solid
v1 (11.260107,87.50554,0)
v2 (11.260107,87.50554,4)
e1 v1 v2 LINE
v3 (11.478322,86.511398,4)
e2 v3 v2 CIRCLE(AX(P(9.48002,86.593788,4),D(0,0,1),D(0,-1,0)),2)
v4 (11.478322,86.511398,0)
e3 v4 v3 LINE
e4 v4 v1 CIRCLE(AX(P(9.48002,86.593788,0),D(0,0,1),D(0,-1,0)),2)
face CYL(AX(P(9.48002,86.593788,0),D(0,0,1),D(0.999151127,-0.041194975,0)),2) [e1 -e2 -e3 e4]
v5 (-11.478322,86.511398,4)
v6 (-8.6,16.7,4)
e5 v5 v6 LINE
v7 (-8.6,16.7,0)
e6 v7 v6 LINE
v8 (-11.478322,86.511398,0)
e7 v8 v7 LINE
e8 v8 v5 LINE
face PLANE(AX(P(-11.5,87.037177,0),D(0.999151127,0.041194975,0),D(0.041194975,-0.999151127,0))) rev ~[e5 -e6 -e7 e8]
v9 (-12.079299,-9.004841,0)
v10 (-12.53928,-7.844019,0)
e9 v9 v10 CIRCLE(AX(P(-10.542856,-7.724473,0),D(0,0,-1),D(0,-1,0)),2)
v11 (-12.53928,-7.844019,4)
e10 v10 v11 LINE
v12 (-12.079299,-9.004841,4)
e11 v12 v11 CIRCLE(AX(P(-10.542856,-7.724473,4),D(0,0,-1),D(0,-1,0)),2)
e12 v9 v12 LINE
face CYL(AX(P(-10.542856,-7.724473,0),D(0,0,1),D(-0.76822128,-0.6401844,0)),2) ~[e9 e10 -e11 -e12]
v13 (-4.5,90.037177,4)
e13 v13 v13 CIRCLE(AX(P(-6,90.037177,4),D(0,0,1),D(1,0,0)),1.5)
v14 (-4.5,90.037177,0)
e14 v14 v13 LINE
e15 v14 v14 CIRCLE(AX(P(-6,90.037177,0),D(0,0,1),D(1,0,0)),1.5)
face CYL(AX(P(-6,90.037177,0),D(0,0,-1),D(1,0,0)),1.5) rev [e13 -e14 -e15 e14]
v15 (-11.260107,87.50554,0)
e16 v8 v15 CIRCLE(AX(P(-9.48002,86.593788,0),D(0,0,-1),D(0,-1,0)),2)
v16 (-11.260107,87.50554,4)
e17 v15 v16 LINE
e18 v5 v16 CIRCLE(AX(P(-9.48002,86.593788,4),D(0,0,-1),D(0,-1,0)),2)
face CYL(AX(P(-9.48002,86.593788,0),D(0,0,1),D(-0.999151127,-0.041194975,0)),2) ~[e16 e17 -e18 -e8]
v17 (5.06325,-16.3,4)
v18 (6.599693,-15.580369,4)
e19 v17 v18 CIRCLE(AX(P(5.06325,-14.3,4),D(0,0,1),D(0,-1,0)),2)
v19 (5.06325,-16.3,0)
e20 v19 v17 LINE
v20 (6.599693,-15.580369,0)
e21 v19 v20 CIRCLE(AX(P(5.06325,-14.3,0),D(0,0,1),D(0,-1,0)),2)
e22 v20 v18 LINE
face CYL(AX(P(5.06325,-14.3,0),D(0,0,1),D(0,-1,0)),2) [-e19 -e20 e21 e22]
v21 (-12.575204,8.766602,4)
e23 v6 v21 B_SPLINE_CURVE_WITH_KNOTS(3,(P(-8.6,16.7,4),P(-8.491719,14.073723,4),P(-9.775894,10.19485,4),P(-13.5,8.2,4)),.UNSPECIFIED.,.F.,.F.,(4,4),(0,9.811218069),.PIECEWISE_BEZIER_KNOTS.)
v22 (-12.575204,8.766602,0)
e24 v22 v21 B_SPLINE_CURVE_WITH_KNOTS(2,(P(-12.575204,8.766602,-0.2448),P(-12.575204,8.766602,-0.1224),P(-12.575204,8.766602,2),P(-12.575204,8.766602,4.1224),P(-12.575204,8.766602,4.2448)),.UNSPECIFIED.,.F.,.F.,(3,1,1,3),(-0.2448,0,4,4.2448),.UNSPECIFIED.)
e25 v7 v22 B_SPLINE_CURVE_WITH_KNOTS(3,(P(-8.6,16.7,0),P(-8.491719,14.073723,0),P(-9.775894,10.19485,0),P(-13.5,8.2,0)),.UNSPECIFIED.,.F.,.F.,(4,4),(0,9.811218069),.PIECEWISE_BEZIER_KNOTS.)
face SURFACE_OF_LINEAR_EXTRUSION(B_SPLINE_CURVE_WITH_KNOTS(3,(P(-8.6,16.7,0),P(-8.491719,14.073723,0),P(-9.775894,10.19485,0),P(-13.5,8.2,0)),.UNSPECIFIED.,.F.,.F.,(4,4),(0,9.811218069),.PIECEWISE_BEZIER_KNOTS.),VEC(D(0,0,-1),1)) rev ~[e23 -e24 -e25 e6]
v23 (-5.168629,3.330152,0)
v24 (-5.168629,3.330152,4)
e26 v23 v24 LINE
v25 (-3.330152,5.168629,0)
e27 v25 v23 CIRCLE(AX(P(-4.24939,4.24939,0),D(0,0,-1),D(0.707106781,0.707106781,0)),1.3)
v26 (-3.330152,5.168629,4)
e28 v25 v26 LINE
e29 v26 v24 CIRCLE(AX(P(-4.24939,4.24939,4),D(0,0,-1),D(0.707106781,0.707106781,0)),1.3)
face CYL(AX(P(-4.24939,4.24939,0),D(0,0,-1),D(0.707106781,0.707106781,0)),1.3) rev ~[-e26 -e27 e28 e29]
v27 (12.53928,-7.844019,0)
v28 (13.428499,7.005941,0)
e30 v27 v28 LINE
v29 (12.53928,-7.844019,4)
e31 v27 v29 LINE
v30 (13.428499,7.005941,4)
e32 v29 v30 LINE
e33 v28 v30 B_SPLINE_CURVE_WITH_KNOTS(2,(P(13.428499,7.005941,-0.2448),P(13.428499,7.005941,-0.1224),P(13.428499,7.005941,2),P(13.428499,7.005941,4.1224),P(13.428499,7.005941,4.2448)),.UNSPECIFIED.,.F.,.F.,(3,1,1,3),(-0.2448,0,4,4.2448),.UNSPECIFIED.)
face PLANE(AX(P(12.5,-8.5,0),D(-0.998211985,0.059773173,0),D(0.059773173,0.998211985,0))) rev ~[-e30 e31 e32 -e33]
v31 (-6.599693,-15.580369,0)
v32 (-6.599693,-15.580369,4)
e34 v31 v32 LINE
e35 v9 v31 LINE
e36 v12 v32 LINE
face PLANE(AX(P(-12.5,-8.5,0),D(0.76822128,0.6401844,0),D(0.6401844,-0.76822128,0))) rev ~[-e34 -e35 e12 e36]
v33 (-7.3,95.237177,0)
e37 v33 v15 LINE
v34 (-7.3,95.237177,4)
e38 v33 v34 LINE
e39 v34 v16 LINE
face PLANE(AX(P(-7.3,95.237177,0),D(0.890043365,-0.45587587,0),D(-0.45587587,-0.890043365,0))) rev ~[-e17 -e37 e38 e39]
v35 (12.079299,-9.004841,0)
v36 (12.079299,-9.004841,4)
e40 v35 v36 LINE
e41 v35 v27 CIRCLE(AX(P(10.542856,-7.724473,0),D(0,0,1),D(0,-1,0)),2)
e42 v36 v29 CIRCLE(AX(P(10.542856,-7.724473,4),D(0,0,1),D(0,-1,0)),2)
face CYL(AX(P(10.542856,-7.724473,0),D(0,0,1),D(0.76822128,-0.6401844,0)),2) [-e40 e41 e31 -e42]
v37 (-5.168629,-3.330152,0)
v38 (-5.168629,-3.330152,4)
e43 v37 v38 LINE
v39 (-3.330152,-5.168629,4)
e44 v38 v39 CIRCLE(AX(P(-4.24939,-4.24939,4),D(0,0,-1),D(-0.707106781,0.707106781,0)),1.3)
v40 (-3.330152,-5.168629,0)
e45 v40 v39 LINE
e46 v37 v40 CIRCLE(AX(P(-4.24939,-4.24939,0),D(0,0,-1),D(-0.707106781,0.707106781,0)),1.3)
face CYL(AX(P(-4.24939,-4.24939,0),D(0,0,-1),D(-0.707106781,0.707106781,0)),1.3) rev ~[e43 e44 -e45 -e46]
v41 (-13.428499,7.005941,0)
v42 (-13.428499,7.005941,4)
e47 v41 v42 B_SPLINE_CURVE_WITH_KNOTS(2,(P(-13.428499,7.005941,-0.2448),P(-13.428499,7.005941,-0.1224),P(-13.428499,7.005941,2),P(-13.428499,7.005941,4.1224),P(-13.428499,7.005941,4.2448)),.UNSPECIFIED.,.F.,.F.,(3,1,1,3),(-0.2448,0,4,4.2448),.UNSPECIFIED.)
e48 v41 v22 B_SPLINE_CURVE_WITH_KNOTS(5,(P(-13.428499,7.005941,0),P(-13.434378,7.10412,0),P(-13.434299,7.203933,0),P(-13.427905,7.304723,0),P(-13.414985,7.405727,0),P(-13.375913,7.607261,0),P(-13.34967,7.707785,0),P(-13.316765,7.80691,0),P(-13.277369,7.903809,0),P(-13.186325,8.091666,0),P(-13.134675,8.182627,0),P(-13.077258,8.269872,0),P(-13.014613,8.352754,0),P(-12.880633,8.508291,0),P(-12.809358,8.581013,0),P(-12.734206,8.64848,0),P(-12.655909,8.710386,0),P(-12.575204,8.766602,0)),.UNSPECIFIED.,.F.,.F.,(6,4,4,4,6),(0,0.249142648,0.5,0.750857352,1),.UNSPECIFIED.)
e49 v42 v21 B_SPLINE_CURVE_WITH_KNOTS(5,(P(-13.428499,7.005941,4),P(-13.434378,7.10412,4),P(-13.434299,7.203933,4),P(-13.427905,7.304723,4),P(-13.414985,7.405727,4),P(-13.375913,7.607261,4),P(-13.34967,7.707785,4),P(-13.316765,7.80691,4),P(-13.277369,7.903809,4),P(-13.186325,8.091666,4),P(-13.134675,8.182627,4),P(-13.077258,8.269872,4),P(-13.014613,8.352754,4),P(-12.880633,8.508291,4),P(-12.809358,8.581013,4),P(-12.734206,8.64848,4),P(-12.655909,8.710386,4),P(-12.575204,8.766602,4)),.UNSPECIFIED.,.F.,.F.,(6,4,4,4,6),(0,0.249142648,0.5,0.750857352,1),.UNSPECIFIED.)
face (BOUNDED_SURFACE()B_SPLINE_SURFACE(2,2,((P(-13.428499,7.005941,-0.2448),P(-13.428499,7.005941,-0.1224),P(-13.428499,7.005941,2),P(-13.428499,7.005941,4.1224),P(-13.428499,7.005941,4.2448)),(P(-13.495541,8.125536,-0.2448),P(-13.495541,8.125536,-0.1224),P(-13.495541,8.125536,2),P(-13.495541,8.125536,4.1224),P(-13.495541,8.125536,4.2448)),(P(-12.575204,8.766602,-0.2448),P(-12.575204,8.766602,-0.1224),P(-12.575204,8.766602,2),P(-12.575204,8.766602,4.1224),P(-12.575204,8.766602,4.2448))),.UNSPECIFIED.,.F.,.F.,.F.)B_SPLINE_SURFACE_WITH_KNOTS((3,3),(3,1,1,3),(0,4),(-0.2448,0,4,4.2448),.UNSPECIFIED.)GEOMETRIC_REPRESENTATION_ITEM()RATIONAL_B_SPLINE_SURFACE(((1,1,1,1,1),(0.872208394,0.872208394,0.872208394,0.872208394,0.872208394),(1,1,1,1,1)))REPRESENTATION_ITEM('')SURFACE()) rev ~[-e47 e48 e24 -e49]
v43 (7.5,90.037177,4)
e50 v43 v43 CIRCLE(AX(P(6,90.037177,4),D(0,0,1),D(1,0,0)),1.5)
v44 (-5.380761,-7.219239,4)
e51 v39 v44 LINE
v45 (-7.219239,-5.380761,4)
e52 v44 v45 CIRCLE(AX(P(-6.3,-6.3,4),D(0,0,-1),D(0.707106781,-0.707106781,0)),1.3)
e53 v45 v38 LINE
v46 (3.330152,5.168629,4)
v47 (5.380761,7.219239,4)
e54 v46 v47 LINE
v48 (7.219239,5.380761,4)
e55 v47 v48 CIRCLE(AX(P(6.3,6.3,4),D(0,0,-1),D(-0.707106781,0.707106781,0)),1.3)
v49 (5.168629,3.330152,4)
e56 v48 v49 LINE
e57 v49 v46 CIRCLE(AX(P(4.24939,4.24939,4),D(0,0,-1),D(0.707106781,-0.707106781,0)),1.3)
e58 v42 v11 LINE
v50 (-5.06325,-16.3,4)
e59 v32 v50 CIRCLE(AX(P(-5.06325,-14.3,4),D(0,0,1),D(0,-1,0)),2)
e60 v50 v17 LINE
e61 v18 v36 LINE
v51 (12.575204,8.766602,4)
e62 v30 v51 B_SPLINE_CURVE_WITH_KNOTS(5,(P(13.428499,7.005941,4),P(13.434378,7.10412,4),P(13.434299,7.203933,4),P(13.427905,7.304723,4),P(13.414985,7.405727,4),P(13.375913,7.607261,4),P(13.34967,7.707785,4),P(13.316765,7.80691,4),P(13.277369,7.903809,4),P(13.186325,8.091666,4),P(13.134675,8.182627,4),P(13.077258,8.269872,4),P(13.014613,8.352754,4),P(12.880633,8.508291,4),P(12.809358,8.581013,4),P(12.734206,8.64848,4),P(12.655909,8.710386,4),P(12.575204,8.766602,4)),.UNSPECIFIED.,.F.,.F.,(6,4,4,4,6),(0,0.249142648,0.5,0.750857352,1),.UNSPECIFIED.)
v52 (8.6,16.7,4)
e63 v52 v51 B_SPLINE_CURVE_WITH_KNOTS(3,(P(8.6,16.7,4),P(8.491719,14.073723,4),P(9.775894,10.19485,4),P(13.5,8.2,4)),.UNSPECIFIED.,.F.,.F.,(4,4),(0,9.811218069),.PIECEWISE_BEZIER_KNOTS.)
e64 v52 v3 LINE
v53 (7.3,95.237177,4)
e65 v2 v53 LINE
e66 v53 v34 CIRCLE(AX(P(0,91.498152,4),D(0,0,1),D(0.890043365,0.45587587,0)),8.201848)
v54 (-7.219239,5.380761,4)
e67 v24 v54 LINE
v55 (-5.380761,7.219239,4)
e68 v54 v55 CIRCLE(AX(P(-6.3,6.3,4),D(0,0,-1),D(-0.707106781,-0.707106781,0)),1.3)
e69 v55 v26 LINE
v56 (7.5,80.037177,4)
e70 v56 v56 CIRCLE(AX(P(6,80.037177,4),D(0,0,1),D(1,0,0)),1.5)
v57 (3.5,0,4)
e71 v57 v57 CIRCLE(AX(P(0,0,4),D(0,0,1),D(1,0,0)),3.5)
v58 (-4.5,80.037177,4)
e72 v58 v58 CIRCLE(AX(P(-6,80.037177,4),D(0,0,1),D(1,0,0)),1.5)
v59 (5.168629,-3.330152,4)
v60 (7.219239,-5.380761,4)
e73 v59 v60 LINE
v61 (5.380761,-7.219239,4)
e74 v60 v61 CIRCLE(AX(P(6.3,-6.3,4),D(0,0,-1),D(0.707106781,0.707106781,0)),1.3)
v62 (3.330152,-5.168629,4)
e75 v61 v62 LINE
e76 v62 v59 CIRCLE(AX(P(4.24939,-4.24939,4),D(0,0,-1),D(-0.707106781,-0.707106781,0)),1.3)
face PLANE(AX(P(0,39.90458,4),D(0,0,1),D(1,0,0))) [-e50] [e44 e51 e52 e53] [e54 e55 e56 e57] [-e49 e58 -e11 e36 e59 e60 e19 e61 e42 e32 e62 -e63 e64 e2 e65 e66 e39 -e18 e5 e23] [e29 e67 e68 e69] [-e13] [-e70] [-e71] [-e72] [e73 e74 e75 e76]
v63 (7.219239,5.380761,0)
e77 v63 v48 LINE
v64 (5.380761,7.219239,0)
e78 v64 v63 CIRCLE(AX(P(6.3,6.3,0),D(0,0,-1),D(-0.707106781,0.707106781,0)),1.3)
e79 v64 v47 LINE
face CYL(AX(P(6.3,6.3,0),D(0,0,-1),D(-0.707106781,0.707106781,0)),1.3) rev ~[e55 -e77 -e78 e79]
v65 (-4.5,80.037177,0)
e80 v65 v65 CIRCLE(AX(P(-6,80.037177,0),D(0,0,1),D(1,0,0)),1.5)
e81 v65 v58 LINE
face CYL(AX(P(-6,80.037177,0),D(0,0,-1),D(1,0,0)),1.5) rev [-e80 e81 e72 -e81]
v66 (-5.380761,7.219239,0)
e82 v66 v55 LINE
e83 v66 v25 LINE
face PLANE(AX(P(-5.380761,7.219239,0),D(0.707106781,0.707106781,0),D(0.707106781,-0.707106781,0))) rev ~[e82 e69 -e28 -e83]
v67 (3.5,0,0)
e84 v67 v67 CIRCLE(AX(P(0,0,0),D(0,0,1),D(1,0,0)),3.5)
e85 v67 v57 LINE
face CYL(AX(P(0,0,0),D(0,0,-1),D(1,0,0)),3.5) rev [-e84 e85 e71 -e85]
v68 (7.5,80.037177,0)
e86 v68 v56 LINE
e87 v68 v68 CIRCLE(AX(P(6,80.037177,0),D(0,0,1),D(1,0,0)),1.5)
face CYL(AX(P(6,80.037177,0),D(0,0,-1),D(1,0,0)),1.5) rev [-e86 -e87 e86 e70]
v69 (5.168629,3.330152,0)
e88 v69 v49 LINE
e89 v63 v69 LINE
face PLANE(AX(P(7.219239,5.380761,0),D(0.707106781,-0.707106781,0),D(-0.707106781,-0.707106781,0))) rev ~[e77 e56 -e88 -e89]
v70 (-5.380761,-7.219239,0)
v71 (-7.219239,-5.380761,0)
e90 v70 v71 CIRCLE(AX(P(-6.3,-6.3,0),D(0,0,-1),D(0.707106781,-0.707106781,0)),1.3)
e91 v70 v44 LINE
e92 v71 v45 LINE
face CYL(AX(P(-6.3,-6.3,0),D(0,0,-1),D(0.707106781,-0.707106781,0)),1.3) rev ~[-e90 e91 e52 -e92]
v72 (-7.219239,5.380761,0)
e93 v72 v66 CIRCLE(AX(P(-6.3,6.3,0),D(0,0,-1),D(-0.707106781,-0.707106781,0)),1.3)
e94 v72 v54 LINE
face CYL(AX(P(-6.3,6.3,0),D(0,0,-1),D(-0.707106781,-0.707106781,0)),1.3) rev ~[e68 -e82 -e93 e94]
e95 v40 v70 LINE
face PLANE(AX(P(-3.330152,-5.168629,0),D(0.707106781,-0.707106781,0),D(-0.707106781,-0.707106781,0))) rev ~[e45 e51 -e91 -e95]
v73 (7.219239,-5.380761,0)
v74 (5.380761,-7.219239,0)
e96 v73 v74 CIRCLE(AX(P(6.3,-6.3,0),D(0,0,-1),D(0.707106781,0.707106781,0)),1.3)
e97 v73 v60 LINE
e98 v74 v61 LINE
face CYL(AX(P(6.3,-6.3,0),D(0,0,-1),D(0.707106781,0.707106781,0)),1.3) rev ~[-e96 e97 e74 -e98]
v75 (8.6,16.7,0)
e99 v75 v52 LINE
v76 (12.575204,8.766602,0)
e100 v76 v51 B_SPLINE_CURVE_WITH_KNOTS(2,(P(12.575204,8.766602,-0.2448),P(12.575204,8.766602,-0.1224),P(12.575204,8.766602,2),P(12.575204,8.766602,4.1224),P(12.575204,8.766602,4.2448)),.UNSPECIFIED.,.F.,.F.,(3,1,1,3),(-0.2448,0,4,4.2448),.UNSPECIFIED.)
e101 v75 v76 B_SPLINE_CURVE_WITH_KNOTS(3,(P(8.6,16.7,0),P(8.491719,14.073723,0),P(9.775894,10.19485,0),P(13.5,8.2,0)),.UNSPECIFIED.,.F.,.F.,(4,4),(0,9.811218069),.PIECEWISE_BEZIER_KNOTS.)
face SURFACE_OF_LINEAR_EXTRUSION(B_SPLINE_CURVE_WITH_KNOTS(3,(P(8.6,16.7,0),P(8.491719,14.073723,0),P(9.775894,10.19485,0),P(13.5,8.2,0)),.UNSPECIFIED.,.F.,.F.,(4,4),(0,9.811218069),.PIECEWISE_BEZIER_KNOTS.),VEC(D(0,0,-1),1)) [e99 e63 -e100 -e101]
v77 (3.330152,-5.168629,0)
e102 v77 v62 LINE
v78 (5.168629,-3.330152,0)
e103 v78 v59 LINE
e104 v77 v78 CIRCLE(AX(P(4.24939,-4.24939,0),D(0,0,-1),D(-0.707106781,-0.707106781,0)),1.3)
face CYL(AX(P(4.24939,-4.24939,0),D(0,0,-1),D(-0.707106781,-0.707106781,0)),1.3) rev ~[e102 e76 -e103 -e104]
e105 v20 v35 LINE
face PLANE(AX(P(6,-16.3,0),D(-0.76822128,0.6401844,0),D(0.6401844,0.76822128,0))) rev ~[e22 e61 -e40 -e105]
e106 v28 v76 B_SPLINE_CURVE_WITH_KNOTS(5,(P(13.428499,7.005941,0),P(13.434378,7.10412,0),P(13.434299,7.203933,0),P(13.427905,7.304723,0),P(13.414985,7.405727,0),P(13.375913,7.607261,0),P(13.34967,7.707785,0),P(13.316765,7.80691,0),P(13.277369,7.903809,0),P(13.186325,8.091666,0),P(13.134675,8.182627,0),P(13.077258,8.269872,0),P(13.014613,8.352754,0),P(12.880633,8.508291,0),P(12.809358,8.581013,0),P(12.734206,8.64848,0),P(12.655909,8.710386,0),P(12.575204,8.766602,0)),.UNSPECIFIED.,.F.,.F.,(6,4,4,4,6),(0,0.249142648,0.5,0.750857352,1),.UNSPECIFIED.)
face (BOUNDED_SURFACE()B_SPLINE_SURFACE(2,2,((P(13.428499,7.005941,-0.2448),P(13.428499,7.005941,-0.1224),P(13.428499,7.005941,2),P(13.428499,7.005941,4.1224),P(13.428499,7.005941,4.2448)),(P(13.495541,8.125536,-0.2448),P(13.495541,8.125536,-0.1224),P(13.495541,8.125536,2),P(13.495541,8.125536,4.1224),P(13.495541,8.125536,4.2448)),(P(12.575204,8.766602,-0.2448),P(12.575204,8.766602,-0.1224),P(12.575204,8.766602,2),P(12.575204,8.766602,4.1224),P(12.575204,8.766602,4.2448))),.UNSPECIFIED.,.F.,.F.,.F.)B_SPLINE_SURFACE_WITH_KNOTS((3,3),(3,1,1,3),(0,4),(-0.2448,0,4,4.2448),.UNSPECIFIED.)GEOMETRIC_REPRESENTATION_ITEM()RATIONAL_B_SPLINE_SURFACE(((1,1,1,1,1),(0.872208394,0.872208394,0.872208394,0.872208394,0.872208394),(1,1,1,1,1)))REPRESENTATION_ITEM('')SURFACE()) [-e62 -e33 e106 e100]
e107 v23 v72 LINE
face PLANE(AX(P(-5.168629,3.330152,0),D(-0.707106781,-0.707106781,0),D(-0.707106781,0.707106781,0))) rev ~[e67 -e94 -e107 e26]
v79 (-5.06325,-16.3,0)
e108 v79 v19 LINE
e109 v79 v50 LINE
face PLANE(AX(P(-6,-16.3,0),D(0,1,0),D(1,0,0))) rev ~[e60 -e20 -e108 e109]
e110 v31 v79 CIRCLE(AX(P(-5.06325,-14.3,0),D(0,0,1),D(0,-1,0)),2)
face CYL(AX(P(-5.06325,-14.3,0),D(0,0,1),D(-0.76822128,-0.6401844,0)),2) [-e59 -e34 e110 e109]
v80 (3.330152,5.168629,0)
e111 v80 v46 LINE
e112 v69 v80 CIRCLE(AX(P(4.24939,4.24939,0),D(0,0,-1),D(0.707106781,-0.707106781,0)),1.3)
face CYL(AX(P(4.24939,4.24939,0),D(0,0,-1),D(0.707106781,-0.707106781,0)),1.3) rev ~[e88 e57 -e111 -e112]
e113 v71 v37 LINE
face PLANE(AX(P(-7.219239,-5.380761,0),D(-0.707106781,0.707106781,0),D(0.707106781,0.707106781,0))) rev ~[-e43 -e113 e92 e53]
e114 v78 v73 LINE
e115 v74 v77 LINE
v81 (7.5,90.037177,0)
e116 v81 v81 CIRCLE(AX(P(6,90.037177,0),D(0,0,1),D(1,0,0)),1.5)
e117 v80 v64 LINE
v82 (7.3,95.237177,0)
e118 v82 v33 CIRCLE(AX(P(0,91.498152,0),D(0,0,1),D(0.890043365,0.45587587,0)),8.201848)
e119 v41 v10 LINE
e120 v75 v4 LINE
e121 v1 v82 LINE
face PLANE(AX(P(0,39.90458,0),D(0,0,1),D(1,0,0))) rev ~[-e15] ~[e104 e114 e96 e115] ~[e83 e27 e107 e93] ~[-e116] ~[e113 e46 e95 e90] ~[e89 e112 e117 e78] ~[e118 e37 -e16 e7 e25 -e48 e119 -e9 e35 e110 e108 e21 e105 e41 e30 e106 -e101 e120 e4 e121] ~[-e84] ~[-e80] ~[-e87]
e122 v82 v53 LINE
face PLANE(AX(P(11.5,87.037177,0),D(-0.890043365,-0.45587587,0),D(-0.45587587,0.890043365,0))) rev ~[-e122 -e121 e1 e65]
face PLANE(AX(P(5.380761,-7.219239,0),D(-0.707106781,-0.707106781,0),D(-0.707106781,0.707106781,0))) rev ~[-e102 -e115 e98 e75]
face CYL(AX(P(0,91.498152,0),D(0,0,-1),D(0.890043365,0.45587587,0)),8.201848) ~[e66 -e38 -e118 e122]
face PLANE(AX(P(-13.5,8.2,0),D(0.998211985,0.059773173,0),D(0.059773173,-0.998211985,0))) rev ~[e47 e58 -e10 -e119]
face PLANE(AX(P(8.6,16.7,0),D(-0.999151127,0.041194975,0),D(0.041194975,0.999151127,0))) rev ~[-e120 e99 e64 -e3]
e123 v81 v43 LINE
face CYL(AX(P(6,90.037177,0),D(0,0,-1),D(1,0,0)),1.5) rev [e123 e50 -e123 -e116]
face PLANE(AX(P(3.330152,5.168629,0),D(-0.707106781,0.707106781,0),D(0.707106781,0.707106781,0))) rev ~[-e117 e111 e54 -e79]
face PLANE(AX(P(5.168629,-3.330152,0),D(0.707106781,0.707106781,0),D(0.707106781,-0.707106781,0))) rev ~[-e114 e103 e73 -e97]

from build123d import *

# Parameters (mm, degrees)
F0_R     = 3.5
F0_R_2   = 1.5
F1_DEPTH = 4
F2_R     = 2


with BuildPart() as f1:
    # F0 (on Top) → F1 (new body)
    with BuildSketch(Plane.XY):
        with BuildLine():
            Line((-12.5, -8.5), (-6, -16.3))
            Line((-6, -16.3), (0, -16.3))
            Line((0, -16.3), (6, -16.3))
            Line((6, -16.3), (12.5, -8.5))
            Line((12.5, -8.5), (13.5, 8.2))
            add(Edge.make_bspline(
                [(8.6, 16.7), (8.4917186517, 14.0737226405), (9.7758937627, 10.1948501542), (13.5, 8.2)],
                knots=[0, 0, 0, 0, 9.8112180691, 9.8112180691, 9.8112180691, 9.8112180691], degree=3))
            Line((8.6, 16.7), (11.5, 87.0371768306))
            Line((11.5, 87.0371768306), (7.3, 95.2371768306))
            ThreePointArc((7.3, 95.2371768306), (0, 99.7), (-7.3, 95.2371768306))
            Line((-7.3, 95.2371768306), (-11.5, 87.0371768306))
            Line((-11.5, 87.0371768306), (-8.6, 16.7))
            add(Edge.make_bspline(
                [(-8.6, 16.7), (-8.4917186517, 14.0737226405), (-9.7758937627, 10.1948501542), (-13.5, 8.2)],
                knots=[0, 0, 0, 0, 9.8112180691, 9.8112180691, 9.8112180691, 9.8112180691], degree=3))
            Line((-13.5, 8.2), (-12.5, -8.5))
        make_face()
        with BuildLine():
            Line((-7.2192388155, -5.3807611845), (-5.1686291501, -3.330151519))
            ThreePointArc((-5.1686291501, -3.330151519), (-3.330151519, -3.330151519), (-3.330151519, -5.1686291501))
            Line((-3.330151519, -5.1686291501), (-5.3807611845, -7.2192388155))
            ThreePointArc((-5.3807611845, -7.2192388155), (-7.2192388155, -7.2192388155), (-7.2192388155, -5.3807611845))
        make_face(mode=Mode.SUBTRACT)
        with BuildLine():
            ThreePointArc((-3.330151519, 5.1686291501), (-3.330151519, 3.330151519), (-5.1686291501, 3.330151519))
            Line((-5.1686291501, 3.330151519), (-7.2192388155, 5.3807611845))
            ThreePointArc((-7.2192388155, 5.3807611845), (-7.2192388155, 7.2192388155), (-5.3807611845, 7.2192388155))
            Line((-5.3807611845, 7.2192388155), (-3.330151519, 5.1686291501))
        make_face(mode=Mode.SUBTRACT)
        with BuildLine():
            Line((5.3807611845, -7.2192388155), (3.330151519, -5.1686291501))
            ThreePointArc((3.330151519, -5.1686291501), (3.330151519, -3.330151519), (5.1686291501, -3.330151519))
            Line((5.1686291501, -3.330151519), (7.2192388155, -5.3807611845))
            ThreePointArc((7.2192388155, -5.3807611845), (7.2192388155, -7.2192388155), (5.3807611845, -7.2192388155))
        make_face(mode=Mode.SUBTRACT)
        Circle(F0_R, mode=Mode.SUBTRACT)
        with BuildLine():
            Line((7.2192388155, 5.3807611845), (5.1686291501, 3.330151519))
            ThreePointArc((5.1686291501, 3.330151519), (3.330151519, 3.330151519), (3.330151519, 5.1686291501))
            Line((3.330151519, 5.1686291501), (5.3807611845, 7.2192388155))
            ThreePointArc((5.3807611845, 7.2192388155), (7.2192388155, 7.2192388155), (7.2192388155, 5.3807611845))
        make_face(mode=Mode.SUBTRACT)
        with Locations((-6, 80.0371768306)):
            Circle(F0_R_2, mode=Mode.SUBTRACT)
        with Locations((-6, 90.0371768306)):
            Circle(F0_R_2, mode=Mode.SUBTRACT)
        with Locations((6, 80.0371768306)):
            Circle(F0_R_2, mode=Mode.SUBTRACT)
        with Locations((6, 90.0371768306)):
            Circle(F0_R_2, mode=Mode.SUBTRACT)
    extrude(amount=F1_DEPTH)

    # F2
    f2_edges = [f1.edges().sort_by_distance(p)[0] for p in [
        (-11.5, 87.037177, 2),
        (11.5, 87.037177, 2),
        (13.5, 8.2, 2),
        (-13.5, 8.2, 2),
        (-12.5, -8.5, 2),
        (12.5, -8.5, 2),
        (6, -16.3, 2),
        (-6, -16.3, 2),
    ]]
    fillet(f2_edges, radius=F2_R)


solid = f1.part
